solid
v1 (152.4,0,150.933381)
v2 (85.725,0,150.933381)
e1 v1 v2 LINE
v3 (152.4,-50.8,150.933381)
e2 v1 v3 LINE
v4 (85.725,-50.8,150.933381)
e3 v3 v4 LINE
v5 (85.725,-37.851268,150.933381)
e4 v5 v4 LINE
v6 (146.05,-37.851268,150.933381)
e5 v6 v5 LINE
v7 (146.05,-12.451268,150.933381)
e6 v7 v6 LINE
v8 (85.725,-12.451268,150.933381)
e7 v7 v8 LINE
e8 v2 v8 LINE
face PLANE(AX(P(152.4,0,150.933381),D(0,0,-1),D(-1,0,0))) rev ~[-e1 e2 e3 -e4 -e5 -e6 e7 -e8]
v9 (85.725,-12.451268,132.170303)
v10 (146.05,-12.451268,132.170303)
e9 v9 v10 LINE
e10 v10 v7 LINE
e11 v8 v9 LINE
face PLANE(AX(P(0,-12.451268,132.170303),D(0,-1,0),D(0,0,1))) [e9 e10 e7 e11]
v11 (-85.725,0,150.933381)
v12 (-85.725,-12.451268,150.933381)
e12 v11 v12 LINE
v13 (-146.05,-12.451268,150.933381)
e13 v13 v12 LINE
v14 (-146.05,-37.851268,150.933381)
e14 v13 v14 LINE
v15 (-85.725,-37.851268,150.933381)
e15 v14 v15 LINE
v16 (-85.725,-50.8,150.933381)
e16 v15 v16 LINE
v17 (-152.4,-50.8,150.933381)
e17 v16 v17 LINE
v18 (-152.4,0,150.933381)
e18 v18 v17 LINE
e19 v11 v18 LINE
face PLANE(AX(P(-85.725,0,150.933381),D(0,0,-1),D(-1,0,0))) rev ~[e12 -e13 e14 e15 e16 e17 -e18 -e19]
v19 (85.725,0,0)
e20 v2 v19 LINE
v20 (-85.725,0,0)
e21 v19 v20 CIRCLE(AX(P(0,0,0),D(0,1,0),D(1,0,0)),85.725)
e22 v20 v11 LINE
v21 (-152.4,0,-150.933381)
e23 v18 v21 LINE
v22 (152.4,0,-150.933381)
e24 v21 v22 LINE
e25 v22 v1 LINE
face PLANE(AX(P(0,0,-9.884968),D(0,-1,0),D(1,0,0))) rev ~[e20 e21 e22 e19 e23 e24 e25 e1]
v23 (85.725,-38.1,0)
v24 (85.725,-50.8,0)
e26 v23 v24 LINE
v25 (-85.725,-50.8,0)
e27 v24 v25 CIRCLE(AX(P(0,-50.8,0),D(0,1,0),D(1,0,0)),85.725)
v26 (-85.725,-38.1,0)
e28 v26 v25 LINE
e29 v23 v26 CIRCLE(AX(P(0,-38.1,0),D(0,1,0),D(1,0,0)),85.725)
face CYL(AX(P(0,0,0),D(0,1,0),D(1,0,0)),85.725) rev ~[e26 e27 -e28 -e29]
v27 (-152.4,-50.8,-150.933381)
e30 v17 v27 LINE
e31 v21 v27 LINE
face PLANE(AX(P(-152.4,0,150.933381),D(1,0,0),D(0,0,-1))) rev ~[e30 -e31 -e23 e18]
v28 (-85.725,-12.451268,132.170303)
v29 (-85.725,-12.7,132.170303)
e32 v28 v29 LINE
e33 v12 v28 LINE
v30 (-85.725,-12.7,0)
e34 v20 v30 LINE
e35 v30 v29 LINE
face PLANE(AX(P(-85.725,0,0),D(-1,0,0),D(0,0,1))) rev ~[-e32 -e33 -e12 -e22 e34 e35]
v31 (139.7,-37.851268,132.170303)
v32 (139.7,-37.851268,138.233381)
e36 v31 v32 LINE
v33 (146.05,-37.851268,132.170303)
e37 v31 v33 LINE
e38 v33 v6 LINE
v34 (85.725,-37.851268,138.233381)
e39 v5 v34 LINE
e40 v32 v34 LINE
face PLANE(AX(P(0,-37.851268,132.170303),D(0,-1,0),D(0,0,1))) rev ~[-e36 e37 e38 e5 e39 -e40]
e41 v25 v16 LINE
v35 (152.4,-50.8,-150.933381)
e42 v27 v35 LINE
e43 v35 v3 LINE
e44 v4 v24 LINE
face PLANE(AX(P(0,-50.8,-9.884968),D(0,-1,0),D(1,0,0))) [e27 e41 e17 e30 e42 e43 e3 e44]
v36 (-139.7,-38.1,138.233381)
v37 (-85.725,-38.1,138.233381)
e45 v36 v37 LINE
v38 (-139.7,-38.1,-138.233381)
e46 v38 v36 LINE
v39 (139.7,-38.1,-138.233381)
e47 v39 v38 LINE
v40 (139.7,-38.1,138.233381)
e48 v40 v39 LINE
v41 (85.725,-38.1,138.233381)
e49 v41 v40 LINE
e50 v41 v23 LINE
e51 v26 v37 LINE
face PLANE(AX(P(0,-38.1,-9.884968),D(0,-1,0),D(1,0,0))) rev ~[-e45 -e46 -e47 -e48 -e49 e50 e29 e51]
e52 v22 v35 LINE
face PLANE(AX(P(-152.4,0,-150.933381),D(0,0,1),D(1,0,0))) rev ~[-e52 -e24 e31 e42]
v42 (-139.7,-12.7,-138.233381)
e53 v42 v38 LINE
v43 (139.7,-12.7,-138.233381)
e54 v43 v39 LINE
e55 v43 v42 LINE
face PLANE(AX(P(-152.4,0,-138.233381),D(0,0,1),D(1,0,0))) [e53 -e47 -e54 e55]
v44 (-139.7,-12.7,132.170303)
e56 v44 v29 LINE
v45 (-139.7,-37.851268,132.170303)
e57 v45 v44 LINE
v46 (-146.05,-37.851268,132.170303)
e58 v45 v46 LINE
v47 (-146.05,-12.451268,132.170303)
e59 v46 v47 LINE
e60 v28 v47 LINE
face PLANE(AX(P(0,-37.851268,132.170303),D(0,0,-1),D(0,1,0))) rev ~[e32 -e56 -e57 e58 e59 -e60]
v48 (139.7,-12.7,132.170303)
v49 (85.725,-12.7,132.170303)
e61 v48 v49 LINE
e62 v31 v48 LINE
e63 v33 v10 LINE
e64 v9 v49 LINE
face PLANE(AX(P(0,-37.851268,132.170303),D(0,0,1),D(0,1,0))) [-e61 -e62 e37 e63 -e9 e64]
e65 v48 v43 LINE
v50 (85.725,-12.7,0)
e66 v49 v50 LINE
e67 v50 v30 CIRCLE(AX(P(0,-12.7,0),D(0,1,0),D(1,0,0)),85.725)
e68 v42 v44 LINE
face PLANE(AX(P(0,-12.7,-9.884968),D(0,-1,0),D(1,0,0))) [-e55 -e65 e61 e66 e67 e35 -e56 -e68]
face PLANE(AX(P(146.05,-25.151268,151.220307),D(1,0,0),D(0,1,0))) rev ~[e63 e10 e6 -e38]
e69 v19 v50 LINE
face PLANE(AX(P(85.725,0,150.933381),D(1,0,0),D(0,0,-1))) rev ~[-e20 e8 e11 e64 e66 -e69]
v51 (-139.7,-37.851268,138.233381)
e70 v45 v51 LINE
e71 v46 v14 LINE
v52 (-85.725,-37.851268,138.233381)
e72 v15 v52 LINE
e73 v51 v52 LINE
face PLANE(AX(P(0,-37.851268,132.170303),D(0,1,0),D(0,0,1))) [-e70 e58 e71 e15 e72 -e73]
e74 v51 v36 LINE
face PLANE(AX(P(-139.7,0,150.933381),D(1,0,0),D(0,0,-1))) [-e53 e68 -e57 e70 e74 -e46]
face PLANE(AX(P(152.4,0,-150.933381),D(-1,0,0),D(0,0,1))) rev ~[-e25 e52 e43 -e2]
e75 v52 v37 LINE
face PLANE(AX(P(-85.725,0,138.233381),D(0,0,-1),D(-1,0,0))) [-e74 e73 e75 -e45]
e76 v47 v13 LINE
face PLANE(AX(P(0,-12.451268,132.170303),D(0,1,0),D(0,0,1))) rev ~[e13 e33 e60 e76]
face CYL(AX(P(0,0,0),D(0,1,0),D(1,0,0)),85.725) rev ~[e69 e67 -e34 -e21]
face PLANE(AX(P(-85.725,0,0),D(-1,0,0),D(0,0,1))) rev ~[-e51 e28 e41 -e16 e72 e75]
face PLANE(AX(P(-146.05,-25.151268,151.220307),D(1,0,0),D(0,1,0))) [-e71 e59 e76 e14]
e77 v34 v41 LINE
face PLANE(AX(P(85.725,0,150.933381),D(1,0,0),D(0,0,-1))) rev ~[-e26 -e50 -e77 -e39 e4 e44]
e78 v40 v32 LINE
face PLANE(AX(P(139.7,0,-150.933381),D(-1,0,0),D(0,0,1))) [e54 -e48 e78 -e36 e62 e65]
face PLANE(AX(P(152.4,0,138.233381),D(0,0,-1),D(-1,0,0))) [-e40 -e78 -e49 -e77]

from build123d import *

# Parameters (mm, degrees)
F1_DEPTH = 50.8
F2_T     = -12.7
F3_W     = 25.4
F3_H     = 38.1000075253
F4_DEPTH = 146.05
F5_DEPTH = 146.05


with BuildPart() as f1:
    # F0 (on Front) → F1 (new body)
    with BuildSketch(Plane.XZ):
        with BuildLine():
            Line((152.4, -150.9333811935), (152.4, 150.9333811935))
            Line((152.4, 150.9333811935), (85.725, 150.9333811935))
            Line((85.725, 150.9333811935), (85.725, 0))
            ThreePointArc((85.725, 0), (0, -85.725), (-85.725, 0))
            Line((-85.725, 0), (-85.725, 150.9333811935))
            Line((-85.725, 150.9333811935), (-152.4, 150.9333811935))
            Line((-152.4, 150.9333811935), (-152.4, -150.9333811935))
            Line((-152.4, -150.9333811935), (152.4, -150.9333811935))
        make_face()
    extrude(amount=F1_DEPTH)

    # F2
    f2_openings = [f1.faces().sort_by_distance(p)[0] for p in [
        (85.725, -25.4, 75.466691),
        (0, -25.4, -85.725),
        (-85.725, -25.4, 75.466691),
    ]]
    offset(amount=F2_T, openings=f2_openings)

    # F3 (on Right) → F4 (cut)
    with BuildSketch(Plane.YZ):
        with Locations((-25.1512676477, 151.2203067541)):
            Rectangle(F3_W, F3_H)
    extrude(amount=-F4_DEPTH, mode=Mode.SUBTRACT)

    # F3 (on Right) → F5 (cut)
    with BuildSketch(Plane.YZ):
        with Locations((-25.1512676477, 151.2203067541)):
            Rectangle(F3_W, F3_H)
    extrude(amount=F5_DEPTH, mode=Mode.SUBTRACT)


solid = f1.part
